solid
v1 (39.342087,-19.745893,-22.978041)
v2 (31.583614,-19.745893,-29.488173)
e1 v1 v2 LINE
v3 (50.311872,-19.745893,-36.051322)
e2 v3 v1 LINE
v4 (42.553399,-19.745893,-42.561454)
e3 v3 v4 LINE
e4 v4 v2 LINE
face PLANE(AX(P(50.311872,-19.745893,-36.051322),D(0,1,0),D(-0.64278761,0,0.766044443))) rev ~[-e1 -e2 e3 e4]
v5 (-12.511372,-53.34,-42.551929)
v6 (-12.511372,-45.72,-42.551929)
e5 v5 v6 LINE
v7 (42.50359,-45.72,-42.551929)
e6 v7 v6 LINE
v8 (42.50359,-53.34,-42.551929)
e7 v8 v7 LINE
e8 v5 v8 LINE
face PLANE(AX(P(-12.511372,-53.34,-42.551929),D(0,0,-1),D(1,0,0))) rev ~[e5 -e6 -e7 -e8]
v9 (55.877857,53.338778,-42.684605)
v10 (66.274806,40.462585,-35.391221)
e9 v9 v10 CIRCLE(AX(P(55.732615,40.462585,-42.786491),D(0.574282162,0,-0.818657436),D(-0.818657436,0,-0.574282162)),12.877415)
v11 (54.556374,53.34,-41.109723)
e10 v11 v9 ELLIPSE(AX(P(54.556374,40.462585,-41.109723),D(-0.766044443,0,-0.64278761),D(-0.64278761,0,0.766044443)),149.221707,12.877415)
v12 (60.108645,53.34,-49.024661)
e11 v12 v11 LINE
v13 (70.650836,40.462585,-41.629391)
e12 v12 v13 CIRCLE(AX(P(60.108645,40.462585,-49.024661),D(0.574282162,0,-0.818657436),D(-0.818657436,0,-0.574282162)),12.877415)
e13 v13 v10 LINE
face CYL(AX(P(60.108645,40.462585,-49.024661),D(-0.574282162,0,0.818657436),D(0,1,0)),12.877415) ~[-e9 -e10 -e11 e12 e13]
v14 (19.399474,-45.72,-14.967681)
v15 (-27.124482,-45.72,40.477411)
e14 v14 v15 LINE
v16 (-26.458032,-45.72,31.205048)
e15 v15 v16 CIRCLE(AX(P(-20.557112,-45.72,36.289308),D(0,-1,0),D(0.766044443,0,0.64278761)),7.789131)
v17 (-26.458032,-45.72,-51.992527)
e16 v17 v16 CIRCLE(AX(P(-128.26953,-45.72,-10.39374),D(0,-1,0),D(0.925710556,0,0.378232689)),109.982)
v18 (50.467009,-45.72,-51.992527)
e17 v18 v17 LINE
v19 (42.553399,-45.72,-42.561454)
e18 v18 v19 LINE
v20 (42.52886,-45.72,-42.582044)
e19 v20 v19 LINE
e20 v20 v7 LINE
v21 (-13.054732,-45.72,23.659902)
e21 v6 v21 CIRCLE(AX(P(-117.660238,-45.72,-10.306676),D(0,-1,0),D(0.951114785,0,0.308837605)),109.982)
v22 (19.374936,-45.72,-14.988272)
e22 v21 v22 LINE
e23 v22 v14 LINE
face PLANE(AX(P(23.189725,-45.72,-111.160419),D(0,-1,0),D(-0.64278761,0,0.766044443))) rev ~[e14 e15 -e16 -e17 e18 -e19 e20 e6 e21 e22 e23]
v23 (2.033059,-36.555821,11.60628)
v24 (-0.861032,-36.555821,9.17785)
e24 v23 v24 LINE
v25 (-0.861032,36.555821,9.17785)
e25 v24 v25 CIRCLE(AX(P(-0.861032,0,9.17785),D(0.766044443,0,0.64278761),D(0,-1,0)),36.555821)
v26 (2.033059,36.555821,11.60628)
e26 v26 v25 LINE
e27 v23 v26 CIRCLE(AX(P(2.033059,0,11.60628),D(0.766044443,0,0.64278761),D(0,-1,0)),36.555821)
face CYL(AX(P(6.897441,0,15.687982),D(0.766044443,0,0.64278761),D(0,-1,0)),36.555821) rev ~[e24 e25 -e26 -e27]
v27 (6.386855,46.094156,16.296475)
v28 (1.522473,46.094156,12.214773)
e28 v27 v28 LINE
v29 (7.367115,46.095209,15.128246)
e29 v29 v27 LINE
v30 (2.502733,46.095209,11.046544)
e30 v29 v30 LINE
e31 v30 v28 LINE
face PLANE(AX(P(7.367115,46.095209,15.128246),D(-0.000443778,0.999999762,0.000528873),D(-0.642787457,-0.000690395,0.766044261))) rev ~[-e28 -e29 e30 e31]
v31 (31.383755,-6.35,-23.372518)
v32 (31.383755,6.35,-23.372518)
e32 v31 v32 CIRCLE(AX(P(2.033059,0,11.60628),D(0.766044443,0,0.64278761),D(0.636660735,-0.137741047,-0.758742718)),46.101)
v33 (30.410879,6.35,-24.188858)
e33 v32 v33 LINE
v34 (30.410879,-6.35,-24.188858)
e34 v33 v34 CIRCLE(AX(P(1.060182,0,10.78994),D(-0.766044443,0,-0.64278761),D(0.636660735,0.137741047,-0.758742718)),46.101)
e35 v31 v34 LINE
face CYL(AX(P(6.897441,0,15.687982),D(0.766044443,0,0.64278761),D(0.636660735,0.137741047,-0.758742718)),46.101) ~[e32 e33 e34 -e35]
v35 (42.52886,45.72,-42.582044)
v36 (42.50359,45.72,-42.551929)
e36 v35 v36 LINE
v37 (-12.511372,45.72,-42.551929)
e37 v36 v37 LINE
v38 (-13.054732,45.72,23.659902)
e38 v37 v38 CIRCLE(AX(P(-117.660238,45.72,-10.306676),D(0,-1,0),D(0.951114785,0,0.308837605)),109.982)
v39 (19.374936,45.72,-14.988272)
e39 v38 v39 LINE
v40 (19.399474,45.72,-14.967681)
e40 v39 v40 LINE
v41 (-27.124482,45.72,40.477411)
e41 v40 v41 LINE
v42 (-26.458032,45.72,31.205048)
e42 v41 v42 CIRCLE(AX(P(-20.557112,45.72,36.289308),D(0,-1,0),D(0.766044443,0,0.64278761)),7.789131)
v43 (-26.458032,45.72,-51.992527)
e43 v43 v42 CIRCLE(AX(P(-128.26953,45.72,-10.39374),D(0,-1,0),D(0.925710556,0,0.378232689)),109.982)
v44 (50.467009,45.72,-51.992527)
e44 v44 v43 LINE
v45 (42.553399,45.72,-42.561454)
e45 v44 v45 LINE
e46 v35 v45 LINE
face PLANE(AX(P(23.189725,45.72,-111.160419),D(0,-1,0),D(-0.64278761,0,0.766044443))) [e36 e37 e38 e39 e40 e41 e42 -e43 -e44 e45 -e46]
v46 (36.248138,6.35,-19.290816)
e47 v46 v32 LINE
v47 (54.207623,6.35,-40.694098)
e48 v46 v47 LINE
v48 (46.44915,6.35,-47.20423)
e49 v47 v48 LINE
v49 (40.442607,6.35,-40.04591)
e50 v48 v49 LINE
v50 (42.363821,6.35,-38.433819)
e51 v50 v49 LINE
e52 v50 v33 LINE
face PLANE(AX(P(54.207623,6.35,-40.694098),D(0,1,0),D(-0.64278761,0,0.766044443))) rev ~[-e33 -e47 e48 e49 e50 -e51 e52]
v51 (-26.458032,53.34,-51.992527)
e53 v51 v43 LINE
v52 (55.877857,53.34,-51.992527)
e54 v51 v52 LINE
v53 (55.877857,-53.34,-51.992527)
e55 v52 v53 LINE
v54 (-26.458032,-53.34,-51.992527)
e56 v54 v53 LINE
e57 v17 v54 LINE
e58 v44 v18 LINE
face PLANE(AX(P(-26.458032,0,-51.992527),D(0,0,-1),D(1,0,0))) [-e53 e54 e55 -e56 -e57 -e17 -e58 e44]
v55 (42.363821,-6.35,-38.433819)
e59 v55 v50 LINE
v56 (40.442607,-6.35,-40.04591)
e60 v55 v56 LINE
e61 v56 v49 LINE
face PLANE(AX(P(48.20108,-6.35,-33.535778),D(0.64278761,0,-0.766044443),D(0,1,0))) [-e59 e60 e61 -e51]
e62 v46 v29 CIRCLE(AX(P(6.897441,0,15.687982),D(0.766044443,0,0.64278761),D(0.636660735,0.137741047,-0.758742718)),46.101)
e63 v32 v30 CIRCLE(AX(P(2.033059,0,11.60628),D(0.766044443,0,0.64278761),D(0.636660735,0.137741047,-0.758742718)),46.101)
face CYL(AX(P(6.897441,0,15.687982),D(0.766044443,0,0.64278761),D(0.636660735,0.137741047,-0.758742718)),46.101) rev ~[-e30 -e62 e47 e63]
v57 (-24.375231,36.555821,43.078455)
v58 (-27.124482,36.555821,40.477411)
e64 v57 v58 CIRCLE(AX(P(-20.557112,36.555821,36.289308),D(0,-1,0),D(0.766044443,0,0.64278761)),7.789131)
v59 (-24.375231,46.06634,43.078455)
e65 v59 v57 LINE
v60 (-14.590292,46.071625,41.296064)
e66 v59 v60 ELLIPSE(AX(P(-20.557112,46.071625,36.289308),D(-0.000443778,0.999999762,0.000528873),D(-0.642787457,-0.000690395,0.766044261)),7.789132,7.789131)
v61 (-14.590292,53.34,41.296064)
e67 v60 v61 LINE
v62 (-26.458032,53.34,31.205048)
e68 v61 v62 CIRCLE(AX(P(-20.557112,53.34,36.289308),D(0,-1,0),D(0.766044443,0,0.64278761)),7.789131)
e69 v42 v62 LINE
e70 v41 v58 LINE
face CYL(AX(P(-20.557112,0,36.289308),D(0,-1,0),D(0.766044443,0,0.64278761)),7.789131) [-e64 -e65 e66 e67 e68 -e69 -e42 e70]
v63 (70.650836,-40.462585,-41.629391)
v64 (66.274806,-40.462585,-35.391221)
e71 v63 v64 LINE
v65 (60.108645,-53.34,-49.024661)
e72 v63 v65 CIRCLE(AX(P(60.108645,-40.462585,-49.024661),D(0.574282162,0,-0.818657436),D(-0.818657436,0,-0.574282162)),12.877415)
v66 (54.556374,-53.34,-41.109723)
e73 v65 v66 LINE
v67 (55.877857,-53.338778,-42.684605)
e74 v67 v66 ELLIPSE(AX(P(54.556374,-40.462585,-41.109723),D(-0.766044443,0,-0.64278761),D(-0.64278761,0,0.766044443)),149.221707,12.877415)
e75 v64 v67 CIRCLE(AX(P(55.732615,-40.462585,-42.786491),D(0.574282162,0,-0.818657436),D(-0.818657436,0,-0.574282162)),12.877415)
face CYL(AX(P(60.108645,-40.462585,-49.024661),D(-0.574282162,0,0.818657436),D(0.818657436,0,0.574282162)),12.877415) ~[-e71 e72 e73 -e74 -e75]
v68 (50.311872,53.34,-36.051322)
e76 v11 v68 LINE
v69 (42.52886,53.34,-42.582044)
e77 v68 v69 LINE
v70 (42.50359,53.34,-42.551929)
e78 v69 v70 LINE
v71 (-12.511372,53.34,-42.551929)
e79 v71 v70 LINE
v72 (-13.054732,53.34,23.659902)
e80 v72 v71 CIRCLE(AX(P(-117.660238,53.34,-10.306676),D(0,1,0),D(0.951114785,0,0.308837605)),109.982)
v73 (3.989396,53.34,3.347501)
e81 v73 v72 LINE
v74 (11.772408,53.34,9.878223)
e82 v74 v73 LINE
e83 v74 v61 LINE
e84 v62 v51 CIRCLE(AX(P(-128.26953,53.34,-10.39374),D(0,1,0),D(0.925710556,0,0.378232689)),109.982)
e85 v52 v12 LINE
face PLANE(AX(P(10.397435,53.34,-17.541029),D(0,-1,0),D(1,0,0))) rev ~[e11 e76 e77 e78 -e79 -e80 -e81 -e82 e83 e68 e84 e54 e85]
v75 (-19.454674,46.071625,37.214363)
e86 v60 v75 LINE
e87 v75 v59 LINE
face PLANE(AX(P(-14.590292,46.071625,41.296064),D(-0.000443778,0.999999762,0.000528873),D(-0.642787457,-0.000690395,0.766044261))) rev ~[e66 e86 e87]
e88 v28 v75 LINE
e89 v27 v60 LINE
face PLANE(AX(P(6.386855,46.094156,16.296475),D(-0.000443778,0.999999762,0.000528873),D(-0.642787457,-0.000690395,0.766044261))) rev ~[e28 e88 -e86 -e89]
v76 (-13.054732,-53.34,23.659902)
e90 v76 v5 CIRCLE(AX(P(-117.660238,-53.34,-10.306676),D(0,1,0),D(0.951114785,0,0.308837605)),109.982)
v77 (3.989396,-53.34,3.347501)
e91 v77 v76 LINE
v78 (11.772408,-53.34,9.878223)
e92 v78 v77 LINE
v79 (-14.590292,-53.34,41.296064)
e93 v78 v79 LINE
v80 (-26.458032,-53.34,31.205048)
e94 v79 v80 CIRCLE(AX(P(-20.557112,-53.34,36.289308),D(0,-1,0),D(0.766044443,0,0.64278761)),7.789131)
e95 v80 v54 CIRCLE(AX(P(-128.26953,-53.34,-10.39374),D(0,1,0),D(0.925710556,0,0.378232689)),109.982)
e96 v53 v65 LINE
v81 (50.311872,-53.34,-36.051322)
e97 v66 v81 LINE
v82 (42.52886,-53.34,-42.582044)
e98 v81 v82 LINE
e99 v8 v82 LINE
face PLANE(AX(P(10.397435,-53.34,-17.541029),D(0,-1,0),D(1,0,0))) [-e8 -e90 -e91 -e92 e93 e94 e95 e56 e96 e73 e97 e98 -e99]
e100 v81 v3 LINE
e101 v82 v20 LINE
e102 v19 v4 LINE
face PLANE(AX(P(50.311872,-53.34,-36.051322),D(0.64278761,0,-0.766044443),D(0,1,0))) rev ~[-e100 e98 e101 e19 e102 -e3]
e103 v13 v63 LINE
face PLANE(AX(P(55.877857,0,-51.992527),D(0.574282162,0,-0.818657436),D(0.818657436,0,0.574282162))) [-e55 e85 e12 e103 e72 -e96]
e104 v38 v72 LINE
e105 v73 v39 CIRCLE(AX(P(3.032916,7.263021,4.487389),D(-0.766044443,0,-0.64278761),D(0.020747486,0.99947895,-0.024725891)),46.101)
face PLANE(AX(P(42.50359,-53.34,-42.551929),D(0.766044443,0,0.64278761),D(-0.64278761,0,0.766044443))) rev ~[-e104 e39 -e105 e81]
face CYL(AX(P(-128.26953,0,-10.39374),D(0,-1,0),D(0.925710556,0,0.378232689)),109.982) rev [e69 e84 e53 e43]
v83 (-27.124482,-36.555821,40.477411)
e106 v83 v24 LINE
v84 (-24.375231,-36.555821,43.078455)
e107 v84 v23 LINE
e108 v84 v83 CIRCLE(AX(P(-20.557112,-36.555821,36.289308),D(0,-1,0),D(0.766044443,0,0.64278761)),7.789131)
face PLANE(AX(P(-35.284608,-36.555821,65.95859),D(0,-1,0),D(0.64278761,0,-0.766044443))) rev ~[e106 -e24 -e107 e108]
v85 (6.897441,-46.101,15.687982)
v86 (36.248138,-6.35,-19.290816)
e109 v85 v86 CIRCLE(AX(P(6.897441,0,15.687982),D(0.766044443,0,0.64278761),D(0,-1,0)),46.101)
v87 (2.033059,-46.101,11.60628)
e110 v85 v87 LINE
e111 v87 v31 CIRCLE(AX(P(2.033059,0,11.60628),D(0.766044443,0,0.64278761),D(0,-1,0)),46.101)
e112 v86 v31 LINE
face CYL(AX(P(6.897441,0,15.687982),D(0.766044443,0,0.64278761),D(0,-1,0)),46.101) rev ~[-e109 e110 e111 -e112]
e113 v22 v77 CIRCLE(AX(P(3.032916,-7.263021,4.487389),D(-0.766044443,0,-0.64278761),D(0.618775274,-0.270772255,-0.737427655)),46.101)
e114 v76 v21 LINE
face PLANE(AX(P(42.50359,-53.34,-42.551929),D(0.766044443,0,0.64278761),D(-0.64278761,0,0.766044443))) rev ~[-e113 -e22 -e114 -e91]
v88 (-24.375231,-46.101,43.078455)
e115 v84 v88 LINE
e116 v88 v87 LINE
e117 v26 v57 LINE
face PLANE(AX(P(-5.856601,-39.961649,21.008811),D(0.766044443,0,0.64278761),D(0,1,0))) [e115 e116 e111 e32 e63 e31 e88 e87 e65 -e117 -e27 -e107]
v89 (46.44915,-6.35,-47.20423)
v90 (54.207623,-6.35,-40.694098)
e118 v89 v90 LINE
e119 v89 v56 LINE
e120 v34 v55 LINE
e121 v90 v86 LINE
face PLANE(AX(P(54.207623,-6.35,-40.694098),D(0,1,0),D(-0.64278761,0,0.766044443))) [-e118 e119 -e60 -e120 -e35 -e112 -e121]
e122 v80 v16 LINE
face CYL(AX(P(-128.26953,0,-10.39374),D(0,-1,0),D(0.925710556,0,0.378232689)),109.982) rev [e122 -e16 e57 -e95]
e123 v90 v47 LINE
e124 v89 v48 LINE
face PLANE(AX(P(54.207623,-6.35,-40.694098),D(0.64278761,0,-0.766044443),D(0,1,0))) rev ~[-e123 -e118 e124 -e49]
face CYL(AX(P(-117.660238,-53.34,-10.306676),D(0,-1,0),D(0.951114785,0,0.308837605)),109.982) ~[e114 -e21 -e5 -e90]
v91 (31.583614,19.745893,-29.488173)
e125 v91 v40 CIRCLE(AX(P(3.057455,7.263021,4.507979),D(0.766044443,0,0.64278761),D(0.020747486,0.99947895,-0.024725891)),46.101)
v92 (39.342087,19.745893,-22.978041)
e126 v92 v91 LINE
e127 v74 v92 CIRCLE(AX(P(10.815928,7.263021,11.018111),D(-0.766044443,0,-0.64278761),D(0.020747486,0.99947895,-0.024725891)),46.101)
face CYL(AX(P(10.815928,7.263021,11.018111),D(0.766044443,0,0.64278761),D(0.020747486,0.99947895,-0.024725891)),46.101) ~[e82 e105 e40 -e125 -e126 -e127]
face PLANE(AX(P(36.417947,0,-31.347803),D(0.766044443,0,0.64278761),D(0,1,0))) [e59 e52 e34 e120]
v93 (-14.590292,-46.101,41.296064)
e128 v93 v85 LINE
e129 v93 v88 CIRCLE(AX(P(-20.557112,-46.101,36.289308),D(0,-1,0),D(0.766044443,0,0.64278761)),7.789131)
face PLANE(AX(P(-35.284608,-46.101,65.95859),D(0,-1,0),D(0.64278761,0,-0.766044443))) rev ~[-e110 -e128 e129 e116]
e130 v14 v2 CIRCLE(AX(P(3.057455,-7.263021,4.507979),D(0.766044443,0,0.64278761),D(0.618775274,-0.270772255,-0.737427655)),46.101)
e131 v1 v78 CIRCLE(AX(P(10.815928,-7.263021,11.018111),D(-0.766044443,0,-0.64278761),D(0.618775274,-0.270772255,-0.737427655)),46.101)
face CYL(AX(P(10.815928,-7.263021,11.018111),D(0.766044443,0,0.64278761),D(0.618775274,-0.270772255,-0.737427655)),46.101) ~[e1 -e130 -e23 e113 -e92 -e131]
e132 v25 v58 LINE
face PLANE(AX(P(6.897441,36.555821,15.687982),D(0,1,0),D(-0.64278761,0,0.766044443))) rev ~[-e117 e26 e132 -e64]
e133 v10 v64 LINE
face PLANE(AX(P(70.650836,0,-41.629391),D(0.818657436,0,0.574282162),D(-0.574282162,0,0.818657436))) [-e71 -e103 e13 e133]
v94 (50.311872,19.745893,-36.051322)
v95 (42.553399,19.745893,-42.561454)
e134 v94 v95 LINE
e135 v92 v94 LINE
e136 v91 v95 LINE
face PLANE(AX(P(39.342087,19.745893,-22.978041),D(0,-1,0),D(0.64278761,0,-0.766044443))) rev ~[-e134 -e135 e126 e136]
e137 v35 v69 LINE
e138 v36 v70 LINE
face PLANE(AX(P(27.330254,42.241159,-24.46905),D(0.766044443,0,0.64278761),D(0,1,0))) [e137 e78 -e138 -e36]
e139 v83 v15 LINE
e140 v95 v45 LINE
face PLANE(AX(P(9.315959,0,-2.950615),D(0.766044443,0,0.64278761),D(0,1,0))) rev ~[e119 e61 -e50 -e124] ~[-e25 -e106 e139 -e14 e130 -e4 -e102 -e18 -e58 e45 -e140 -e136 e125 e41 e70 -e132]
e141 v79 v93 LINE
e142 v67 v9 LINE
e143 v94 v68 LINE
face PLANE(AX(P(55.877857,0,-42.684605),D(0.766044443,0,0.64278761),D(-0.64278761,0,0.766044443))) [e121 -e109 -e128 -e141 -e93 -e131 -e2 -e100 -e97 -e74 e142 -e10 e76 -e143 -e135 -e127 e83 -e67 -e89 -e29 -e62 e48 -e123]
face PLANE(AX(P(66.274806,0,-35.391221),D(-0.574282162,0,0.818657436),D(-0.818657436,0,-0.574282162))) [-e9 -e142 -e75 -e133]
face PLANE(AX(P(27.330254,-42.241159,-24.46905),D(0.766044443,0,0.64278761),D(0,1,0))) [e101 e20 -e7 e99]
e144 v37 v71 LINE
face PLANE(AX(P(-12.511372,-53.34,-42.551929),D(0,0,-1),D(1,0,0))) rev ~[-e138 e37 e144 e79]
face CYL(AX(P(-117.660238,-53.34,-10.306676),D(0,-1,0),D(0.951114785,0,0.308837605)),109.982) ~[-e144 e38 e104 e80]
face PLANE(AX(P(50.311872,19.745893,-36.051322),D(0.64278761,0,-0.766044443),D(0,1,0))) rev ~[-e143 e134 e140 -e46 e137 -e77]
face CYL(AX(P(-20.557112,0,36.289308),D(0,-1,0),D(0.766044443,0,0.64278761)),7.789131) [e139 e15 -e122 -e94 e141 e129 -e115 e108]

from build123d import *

# Parameters (mm, degrees)
F1_DEPTH  = 53.34
F2_W      = 9.5451793726
F2_H      = 32.1946403572
F3_DEPTH  = 6.35
F2_W_2    = 12.7
F2_H_2    = 9.3445232351
F4_DEPTH  = 7.62
F6_DEPTH  = 106.68
F8_W      = 91.44
F8_H      = 183.6228075896
F9_DEPTH  = 58.928
F10_DEPTH = 25.4
F11_DEPTH = 70.503420446
F12_R     = 12.8774151417
F13_DEPTH = 10.16


# Not quite as in the source:
# - a feature names something its author has since deleted; it is built from what else it names


with BuildPart() as f1:
    # F0 (on Front) → F1 (new body, symmetric)
    with BuildSketch(Plane.XZ):
        with BuildLine():
            ThreePointArc((-26.4580316219, 31.2050478526), (-18.2875299748, -10.3937397156), (-26.4580316219, -51.9925272838))
            Line((-26.4580316219, -51.9925272838), (55.8778569108, -51.9925272838))
            Line((55.8778569108, -51.9925272838), (70.650836429, -41.6293909539))
            Line((70.650836429, -41.6293909539), (66.2748063527, -35.3912212887))
            Line((66.2748063527, -35.3912212887), (55.8778569108, -42.6846047493))
            Line((55.8778569108, -42.6846047493), (-14.5902915946, 41.2960643955))
            ThreePointArc((-14.5902915946, 41.2960643955), (-25.6027276184, 42.2233043466), (-26.4580316219, 31.2050478526))
        make_face()
    extrude(amount=F1_DEPTH, both=True)

    # F2 (on face) → F3 (cut)
    with BuildSketch(Plane(origin=(11.772407622, 0, 9.8782228937), x_dir=(0, 1, 0), z_dir=(0.7660444431, 0, 0.6427876097))):
        with BuildLine():
            ThreePointArc((-36.5558206274, 35.6727858321), (-43.6495251277, 22.4172118106), (-46.101, 7.584101647))
            Line((-46.101, 7.584101647), (-36.5558206274, 7.584101647))
            Line((-36.5558206274, 7.584101647), (-36.5558206274, 35.6727858321))
        make_face()
        with BuildLine():
            Line((36.5558206274, 41.0130793115), (36.5558206274, 35.6727858321))
            ThreePointArc((36.5558206274, 35.6727858321), (43.5201114475, 22.7927209334), (46.0941562407, 8.3784324728))
            Line((46.0941562407, 8.3784324728), (46.0716254282, 41.0130793115))
            Line((46.0716254282, 41.0130793115), (36.5558206274, 41.0130793115))
        make_face()
        with BuildLine():
            Line((-36.5558206274, 41.0130793115), (-31.7459549124, 41.0130793115))
            ThreePointArc((-31.7459549124, 41.0130793115), (-17.0908294369, 50.4000536994), (0, 53.685101647))
            Line((0, 53.685101647), (0, 73.2077196687))
            Line((0, 73.2077196687), (-36.5558206274, 73.2077196687))
            Line((-36.5558206274, 73.2077196687), (-36.5558206274, 41.0130793115))
        make_face()
        with Locations((-41.3284103137, 57.1103994901)):
            Rectangle(F2_W, F2_H)
        Polygon((36.5558206274, 73.1040577223), (36.5558206274, 41.0130793115), (46.0716254282, 41.0130793115), (46.0494885484, 73.0771363708), align=None)
        with BuildLine():
            ThreePointArc((0, 53.685101647), (-17.0908294369, 50.4000536994), (-31.7459549124, 41.0130793115))
            Line((-31.7459549124, 41.0130793115), (-14.7929535268, 41.0130793115))
            ThreePointArc((-14.7929535268, 41.0130793115), (-7.5599044465, 43.3496698167), (0, 44.1399222744))
            Line((0, 44.1399222744), (0, 53.685101647))
        make_face()
        with BuildLine():
            ThreePointArc((31.7459549124, 41.0130793115), (17.0908294369, 50.4000536994), (0, 53.685101647))
            Line((0, 53.685101647), (0, 44.1399222744))
            ThreePointArc((0, 44.1399222744), (7.5599044465, 43.3496698167), (14.7929535268, 41.0130793115))
            Line((14.7929535268, 41.0130793115), (31.7459549124, 41.0130793115))
        make_face()
        with BuildLine():
            Line((-46.101, 41.0130793115), (-46.101, 7.584101647))
            ThreePointArc((-46.101, 7.584101647), (-43.6495251277, 22.4172118106), (-36.5558206274, 35.6727858321))
            Line((-36.5558206274, 35.6727858321), (-36.5558206274, 41.0130793115))
            Line((-36.5558206274, 41.0130793115), (-46.101, 41.0130793115))
        make_face()
        with BuildLine():
            Line((0, 73.2077196687), (0, 53.685101647))
            ThreePointArc((0, 53.685101647), (17.0908294369, 50.4000536994), (31.7459549124, 41.0130793115))
            Line((31.7459549124, 41.0130793115), (36.5558206274, 41.0130793115))
            Line((36.5558206274, 41.0130793115), (36.5558206274, 73.1040577223))
            Line((36.5558206274, 73.1040577223), (0, 73.2077196687))
        make_face()
        with BuildLine():
            Line((-36.5558206274, 41.0130793115), (-36.5558206274, 35.6727858321))
            ThreePointArc((-36.5558206274, 35.6727858321), (-34.2551137655, 38.4368062596), (-31.7459549124, 41.0130793115))
            Line((-31.7459549124, 41.0130793115), (-36.5558206274, 41.0130793115))
        make_face()
        with BuildLine():
            ThreePointArc((-31.7459549124, 41.0130793115), (-34.2551137655, 38.4368062596), (-36.5558206274, 35.6727858321))
            Line((-36.5558206274, 35.6727858321), (-36.5558206274, 7.584101647))
            ThreePointArc((-36.5558206274, 7.584101647), (-30.635735485, 27.5285177335), (-14.7929535268, 41.0130793115))
            Line((-14.7929535268, 41.0130793115), (-31.7459549124, 41.0130793115))
        make_face()
        with BuildLine():
            ThreePointArc((14.7929535268, 41.0130793115), (30.635735485, 27.5285177335), (36.5558206274, 7.584101647))
            Line((36.5558206274, 7.584101647), (36.5558206274, 35.6727858321))
            ThreePointArc((36.5558206274, 35.6727858321), (34.2551137655, 38.4368062596), (31.7459549124, 41.0130793115))
            Line((31.7459549124, 41.0130793115), (14.7929535268, 41.0130793115))
        make_face()
        with BuildLine():
            Line((-36.5558206274, 7.584101647), (-46.101, 7.584101647))
            ThreePointArc((-46.101, 7.584101647), (-34.7709904302, -22.686022659), (-6.35, -38.0774763043))
            ThreePointArc((-6.35, -38.0774763043), (0, -38.516898353), (6.35, -38.0774763043))
            ThreePointArc((6.35, -38.0774763043), (34.5300058488, -22.9606343493), (46.0952091038, 6.8534179416))
            Line((46.0952091038, 6.8534179416), (46.0941562407, 8.3784324728))
            ThreePointArc((46.0941562407, 8.3784324728), (43.5201114475, 22.7927209334), (36.5558206274, 35.6727858321))
            Line((36.5558206274, 35.6727858321), (36.5558206274, 7.584101647))
            ThreePointArc((36.5558206274, 7.584101647), (0, -28.9717189805), (-36.5558206274, 7.584101647))
        make_face()
        with BuildLine():
            Line((0, 7.584101647), (-36.5558206274, 7.584101647))
            ThreePointArc((-36.5558206274, 7.584101647), (0, -28.9717189805), (36.5558206274, 7.584101647))
            ThreePointArc((36.5558206274, 7.584101647), (30.635735485, 27.5285177335), (14.7929535268, 41.0130793115))
            Line((14.7929535268, 41.0130793115), (0, 41.0130793115))
            Line((0, 41.0130793115), (0, 7.584101647))
        make_face()
        with BuildLine():
            ThreePointArc((-14.7929535268, 41.0130793115), (-30.635735485, 27.5285177335), (-36.5558206274, 7.584101647))
            Line((-36.5558206274, 7.584101647), (0, 7.584101647))
            Line((0, 7.584101647), (0, 41.0130793115))
            Line((0, 41.0130793115), (-14.7929535268, 41.0130793115))
        make_face()
        with BuildLine():
            ThreePointArc((31.7459549124, 41.0130793115), (34.2551137655, 38.4368062596), (36.5558206274, 35.6727858321))
            Line((36.5558206274, 35.6727858321), (36.5558206274, 41.0130793115))
            Line((36.5558206274, 41.0130793115), (31.7459549124, 41.0130793115))
        make_face()
    extrude(amount=-F3_DEPTH, mode=Mode.SUBTRACT)

    # F2 (on face) → F4 (cut)
    with BuildSketch(Plane(origin=(11.772407622, 0, 9.8782228937), x_dir=(0, 1, 0), z_dir=(0.7660444431, 0, 0.6427876097))):
        with BuildLine():
            ThreePointArc((6.35, -38.0774763043), (0, -38.516898353), (-6.35, -38.0774763043))
            Line((-6.35, -38.0774763043), (-6.35, -56.6729530692))
            Line((-6.35, -56.6729530692), (6.35, -56.6729530692))
            Line((6.35, -56.6729530692), (6.35, -38.0774763043))
        make_face()
        with Locations((0, -61.3452146868)):
            Rectangle(F2_W_2, F2_H_2)
    extrude(amount=-F4_DEPTH, mode=Mode.SUBTRACT)

    # F5 (on face) → F6 (cut, through all)
    with BuildSketch(Plane.XZ.offset(53.34)):
        with BuildLine():
            Line((42.5035902841, -42.5519285295), (-13.0547319913, 23.6599016408))
            ThreePointArc((-13.0547319913, 23.6599016408), (-7.6819414216, -9.4041517757), (-12.5113723521, -42.5519285295))
            Line((-12.5113723521, -42.5519285295), (42.5035902841, -42.5519285295))
        make_face()
    extrude(amount=-F6_DEPTH, mode=Mode.SUBTRACT)

    # F8 (on face) → F9 (cut)
    with BuildSketch(Plane(origin=(-41.1275322828, 0, -34.5100971697), x_dir=(0, 1, 0), z_dir=(0.7660444431, 0, 0.6427876097))):
        with Locations((0, -8.2484856248)):
            Rectangle(F8_W, F8_H)
    extrude(amount=F9_DEPTH, mode=Mode.SUBTRACT)

    # F2 (on face) → F10 (cut)
    with BuildSketch(Plane(origin=(11.772407622, 0, 9.8782228937), x_dir=(0, 1, 0), z_dir=(0.7660444431, 0, 0.6427876097))):
        with BuildLine():
            ThreePointArc((-14.7929535268, 41.0130793115), (-30.635735485, 27.5285177335), (-36.5558206274, 7.584101647))
            Line((-36.5558206274, 7.584101647), (0, 7.584101647))
            Line((0, 7.584101647), (0, 41.0130793115))
            Line((0, 41.0130793115), (-14.7929535268, 41.0130793115))
        make_face()
        with BuildLine():
            Line((0, 7.584101647), (-36.5558206274, 7.584101647))
            ThreePointArc((-36.5558206274, 7.584101647), (0, -28.9717189805), (36.5558206274, 7.584101647))
            ThreePointArc((36.5558206274, 7.584101647), (30.635735485, 27.5285177335), (14.7929535268, 41.0130793115))
            Line((14.7929535268, 41.0130793115), (0, 41.0130793115))
            Line((0, 41.0130793115), (0, 7.584101647))
        make_face()
        with BuildLine():
            ThreePointArc((-31.7459549124, 41.0130793115), (-34.2551137655, 38.4368062596), (-36.5558206274, 35.6727858321))
            Line((-36.5558206274, 35.6727858321), (-36.5558206274, 7.584101647))
            ThreePointArc((-36.5558206274, 7.584101647), (-30.635735485, 27.5285177335), (-14.7929535268, 41.0130793115))
            Line((-14.7929535268, 41.0130793115), (-31.7459549124, 41.0130793115))
        make_face()
        with BuildLine():
            ThreePointArc((14.7929535268, 41.0130793115), (30.635735485, 27.5285177335), (36.5558206274, 7.584101647))
            Line((36.5558206274, 7.584101647), (36.5558206274, 35.6727858321))
            ThreePointArc((36.5558206274, 35.6727858321), (34.2551137655, 38.4368062596), (31.7459549124, 41.0130793115))
            Line((31.7459549124, 41.0130793115), (14.7929535268, 41.0130793115))
        make_face()
        with BuildLine():
            ThreePointArc((31.7459549124, 41.0130793115), (17.0908294369, 50.4000536994), (0, 53.685101647))
            Line((0, 53.685101647), (0, 44.1399222744))
            ThreePointArc((0, 44.1399222744), (7.5599044465, 43.3496698167), (14.7929535268, 41.0130793115))
            Line((14.7929535268, 41.0130793115), (31.7459549124, 41.0130793115))
        make_face()
        with BuildLine():
            ThreePointArc((0, 53.685101647), (-17.0908294369, 50.4000536994), (-31.7459549124, 41.0130793115))
            Line((-31.7459549124, 41.0130793115), (-14.7929535268, 41.0130793115))
            ThreePointArc((-14.7929535268, 41.0130793115), (-7.5599044465, 43.3496698167), (0, 44.1399222744))
            Line((0, 44.1399222744), (0, 53.685101647))
        make_face()
        with BuildLine():
            Line((-36.5558206274, 41.0130793115), (-31.7459549124, 41.0130793115))
            ThreePointArc((-31.7459549124, 41.0130793115), (-17.0908294369, 50.4000536994), (0, 53.685101647))
            Line((0, 53.685101647), (0, 73.2077196687))
            Line((0, 73.2077196687), (-36.5558206274, 73.2077196687))
            Line((-36.5558206274, 73.2077196687), (-36.5558206274, 41.0130793115))
        make_face()
        with BuildLine():
            Line((-36.5558206274, 41.0130793115), (-36.5558206274, 35.6727858321))
            ThreePointArc((-36.5558206274, 35.6727858321), (-34.2551137655, 38.4368062596), (-31.7459549124, 41.0130793115))
            Line((-31.7459549124, 41.0130793115), (-36.5558206274, 41.0130793115))
        make_face()
        with BuildLine():
            Line((0, 73.2077196687), (0, 53.685101647))
            ThreePointArc((0, 53.685101647), (17.0908294369, 50.4000536994), (31.7459549124, 41.0130793115))
            Line((31.7459549124, 41.0130793115), (36.5558206274, 41.0130793115))
            Line((36.5558206274, 41.0130793115), (36.5558206274, 73.1040577223))
            Line((36.5558206274, 73.1040577223), (0, 73.2077196687))
        make_face()
        with BuildLine():
            ThreePointArc((31.7459549124, 41.0130793115), (34.2551137655, 38.4368062596), (36.5558206274, 35.6727858321))
            Line((36.5558206274, 35.6727858321), (36.5558206274, 41.0130793115))
            Line((36.5558206274, 41.0130793115), (31.7459549124, 41.0130793115))
        make_face()
        with BuildLine():
            Line((0, 44.1399222744), (0, 41.0130793115))
            Line((0, 41.0130793115), (14.7929535268, 41.0130793115))
            ThreePointArc((14.7929535268, 41.0130793115), (7.5599044465, 43.3496698167), (0, 44.1399222744))
        make_face()
        with BuildLine():
            ThreePointArc((0, 44.1399222744), (-7.5599044465, 43.3496698167), (-14.7929535268, 41.0130793115))
            Line((-14.7929535268, 41.0130793115), (0, 41.0130793115))
            Line((0, 41.0130793115), (0, 44.1399222744))
        make_face()
    extrude(amount=-F10_DEPTH, mode=Mode.SUBTRACT)

    # F2 (on face) → F11 (cut, through all)
    with BuildSketch(Plane(origin=(11.772407622, 0, 9.8782228937), x_dir=(0, 1, 0), z_dir=(0.7660444431, 0, 0.6427876097))):
        with Locations((0, -61.3452146868)):
            Rectangle(F2_W_2, F2_H_2)
    extrude(amount=-F11_DEPTH, mode=Mode.SUBTRACT)

    # F12
    f12_edges = [f1.edges().sort_by_distance(p)[0] for p in [
        (68.462821, -53.34, -38.510306),
        (68.462821, 53.34, -38.510306),
    ]]
    fillet(f12_edges, radius=F12_R)

    # F2 (on face) → F13 (cut)
    with BuildSketch(Plane(origin=(11.772407622, 0, 9.8782228937), x_dir=(0, 1, 0), z_dir=(0.7660444431, 0, 0.6427876097))):
        with BuildLine():
            ThreePointArc((-19.7458926348, -42.8908065921), (-43.5565376092, -26.93877956), (-53.34, 0))
            Line((-53.34, 0), (-53.34, -59.9567629397))
            Line((-53.34, -59.9567629397), (-19.7458926348, -59.9567629397))
            Line((-19.7458926348, -59.9567629397), (-19.7458926348, -42.8908065921))
        make_face()
        with BuildLine():
            Line((53.34, -59.9567629397), (53.34, 0))
            ThreePointArc((53.34, 0), (43.5565376092, -26.93877956), (19.7458926348, -42.8908065921))
            Line((19.7458926348, -42.8908065921), (19.7458926348, -59.9567629397))
            Line((19.7458926348, -59.9567629397), (53.34, -59.9567629397))
        make_face()
    extrude(amount=-F13_DEPTH, mode=Mode.SUBTRACT)


solid = f1.part
